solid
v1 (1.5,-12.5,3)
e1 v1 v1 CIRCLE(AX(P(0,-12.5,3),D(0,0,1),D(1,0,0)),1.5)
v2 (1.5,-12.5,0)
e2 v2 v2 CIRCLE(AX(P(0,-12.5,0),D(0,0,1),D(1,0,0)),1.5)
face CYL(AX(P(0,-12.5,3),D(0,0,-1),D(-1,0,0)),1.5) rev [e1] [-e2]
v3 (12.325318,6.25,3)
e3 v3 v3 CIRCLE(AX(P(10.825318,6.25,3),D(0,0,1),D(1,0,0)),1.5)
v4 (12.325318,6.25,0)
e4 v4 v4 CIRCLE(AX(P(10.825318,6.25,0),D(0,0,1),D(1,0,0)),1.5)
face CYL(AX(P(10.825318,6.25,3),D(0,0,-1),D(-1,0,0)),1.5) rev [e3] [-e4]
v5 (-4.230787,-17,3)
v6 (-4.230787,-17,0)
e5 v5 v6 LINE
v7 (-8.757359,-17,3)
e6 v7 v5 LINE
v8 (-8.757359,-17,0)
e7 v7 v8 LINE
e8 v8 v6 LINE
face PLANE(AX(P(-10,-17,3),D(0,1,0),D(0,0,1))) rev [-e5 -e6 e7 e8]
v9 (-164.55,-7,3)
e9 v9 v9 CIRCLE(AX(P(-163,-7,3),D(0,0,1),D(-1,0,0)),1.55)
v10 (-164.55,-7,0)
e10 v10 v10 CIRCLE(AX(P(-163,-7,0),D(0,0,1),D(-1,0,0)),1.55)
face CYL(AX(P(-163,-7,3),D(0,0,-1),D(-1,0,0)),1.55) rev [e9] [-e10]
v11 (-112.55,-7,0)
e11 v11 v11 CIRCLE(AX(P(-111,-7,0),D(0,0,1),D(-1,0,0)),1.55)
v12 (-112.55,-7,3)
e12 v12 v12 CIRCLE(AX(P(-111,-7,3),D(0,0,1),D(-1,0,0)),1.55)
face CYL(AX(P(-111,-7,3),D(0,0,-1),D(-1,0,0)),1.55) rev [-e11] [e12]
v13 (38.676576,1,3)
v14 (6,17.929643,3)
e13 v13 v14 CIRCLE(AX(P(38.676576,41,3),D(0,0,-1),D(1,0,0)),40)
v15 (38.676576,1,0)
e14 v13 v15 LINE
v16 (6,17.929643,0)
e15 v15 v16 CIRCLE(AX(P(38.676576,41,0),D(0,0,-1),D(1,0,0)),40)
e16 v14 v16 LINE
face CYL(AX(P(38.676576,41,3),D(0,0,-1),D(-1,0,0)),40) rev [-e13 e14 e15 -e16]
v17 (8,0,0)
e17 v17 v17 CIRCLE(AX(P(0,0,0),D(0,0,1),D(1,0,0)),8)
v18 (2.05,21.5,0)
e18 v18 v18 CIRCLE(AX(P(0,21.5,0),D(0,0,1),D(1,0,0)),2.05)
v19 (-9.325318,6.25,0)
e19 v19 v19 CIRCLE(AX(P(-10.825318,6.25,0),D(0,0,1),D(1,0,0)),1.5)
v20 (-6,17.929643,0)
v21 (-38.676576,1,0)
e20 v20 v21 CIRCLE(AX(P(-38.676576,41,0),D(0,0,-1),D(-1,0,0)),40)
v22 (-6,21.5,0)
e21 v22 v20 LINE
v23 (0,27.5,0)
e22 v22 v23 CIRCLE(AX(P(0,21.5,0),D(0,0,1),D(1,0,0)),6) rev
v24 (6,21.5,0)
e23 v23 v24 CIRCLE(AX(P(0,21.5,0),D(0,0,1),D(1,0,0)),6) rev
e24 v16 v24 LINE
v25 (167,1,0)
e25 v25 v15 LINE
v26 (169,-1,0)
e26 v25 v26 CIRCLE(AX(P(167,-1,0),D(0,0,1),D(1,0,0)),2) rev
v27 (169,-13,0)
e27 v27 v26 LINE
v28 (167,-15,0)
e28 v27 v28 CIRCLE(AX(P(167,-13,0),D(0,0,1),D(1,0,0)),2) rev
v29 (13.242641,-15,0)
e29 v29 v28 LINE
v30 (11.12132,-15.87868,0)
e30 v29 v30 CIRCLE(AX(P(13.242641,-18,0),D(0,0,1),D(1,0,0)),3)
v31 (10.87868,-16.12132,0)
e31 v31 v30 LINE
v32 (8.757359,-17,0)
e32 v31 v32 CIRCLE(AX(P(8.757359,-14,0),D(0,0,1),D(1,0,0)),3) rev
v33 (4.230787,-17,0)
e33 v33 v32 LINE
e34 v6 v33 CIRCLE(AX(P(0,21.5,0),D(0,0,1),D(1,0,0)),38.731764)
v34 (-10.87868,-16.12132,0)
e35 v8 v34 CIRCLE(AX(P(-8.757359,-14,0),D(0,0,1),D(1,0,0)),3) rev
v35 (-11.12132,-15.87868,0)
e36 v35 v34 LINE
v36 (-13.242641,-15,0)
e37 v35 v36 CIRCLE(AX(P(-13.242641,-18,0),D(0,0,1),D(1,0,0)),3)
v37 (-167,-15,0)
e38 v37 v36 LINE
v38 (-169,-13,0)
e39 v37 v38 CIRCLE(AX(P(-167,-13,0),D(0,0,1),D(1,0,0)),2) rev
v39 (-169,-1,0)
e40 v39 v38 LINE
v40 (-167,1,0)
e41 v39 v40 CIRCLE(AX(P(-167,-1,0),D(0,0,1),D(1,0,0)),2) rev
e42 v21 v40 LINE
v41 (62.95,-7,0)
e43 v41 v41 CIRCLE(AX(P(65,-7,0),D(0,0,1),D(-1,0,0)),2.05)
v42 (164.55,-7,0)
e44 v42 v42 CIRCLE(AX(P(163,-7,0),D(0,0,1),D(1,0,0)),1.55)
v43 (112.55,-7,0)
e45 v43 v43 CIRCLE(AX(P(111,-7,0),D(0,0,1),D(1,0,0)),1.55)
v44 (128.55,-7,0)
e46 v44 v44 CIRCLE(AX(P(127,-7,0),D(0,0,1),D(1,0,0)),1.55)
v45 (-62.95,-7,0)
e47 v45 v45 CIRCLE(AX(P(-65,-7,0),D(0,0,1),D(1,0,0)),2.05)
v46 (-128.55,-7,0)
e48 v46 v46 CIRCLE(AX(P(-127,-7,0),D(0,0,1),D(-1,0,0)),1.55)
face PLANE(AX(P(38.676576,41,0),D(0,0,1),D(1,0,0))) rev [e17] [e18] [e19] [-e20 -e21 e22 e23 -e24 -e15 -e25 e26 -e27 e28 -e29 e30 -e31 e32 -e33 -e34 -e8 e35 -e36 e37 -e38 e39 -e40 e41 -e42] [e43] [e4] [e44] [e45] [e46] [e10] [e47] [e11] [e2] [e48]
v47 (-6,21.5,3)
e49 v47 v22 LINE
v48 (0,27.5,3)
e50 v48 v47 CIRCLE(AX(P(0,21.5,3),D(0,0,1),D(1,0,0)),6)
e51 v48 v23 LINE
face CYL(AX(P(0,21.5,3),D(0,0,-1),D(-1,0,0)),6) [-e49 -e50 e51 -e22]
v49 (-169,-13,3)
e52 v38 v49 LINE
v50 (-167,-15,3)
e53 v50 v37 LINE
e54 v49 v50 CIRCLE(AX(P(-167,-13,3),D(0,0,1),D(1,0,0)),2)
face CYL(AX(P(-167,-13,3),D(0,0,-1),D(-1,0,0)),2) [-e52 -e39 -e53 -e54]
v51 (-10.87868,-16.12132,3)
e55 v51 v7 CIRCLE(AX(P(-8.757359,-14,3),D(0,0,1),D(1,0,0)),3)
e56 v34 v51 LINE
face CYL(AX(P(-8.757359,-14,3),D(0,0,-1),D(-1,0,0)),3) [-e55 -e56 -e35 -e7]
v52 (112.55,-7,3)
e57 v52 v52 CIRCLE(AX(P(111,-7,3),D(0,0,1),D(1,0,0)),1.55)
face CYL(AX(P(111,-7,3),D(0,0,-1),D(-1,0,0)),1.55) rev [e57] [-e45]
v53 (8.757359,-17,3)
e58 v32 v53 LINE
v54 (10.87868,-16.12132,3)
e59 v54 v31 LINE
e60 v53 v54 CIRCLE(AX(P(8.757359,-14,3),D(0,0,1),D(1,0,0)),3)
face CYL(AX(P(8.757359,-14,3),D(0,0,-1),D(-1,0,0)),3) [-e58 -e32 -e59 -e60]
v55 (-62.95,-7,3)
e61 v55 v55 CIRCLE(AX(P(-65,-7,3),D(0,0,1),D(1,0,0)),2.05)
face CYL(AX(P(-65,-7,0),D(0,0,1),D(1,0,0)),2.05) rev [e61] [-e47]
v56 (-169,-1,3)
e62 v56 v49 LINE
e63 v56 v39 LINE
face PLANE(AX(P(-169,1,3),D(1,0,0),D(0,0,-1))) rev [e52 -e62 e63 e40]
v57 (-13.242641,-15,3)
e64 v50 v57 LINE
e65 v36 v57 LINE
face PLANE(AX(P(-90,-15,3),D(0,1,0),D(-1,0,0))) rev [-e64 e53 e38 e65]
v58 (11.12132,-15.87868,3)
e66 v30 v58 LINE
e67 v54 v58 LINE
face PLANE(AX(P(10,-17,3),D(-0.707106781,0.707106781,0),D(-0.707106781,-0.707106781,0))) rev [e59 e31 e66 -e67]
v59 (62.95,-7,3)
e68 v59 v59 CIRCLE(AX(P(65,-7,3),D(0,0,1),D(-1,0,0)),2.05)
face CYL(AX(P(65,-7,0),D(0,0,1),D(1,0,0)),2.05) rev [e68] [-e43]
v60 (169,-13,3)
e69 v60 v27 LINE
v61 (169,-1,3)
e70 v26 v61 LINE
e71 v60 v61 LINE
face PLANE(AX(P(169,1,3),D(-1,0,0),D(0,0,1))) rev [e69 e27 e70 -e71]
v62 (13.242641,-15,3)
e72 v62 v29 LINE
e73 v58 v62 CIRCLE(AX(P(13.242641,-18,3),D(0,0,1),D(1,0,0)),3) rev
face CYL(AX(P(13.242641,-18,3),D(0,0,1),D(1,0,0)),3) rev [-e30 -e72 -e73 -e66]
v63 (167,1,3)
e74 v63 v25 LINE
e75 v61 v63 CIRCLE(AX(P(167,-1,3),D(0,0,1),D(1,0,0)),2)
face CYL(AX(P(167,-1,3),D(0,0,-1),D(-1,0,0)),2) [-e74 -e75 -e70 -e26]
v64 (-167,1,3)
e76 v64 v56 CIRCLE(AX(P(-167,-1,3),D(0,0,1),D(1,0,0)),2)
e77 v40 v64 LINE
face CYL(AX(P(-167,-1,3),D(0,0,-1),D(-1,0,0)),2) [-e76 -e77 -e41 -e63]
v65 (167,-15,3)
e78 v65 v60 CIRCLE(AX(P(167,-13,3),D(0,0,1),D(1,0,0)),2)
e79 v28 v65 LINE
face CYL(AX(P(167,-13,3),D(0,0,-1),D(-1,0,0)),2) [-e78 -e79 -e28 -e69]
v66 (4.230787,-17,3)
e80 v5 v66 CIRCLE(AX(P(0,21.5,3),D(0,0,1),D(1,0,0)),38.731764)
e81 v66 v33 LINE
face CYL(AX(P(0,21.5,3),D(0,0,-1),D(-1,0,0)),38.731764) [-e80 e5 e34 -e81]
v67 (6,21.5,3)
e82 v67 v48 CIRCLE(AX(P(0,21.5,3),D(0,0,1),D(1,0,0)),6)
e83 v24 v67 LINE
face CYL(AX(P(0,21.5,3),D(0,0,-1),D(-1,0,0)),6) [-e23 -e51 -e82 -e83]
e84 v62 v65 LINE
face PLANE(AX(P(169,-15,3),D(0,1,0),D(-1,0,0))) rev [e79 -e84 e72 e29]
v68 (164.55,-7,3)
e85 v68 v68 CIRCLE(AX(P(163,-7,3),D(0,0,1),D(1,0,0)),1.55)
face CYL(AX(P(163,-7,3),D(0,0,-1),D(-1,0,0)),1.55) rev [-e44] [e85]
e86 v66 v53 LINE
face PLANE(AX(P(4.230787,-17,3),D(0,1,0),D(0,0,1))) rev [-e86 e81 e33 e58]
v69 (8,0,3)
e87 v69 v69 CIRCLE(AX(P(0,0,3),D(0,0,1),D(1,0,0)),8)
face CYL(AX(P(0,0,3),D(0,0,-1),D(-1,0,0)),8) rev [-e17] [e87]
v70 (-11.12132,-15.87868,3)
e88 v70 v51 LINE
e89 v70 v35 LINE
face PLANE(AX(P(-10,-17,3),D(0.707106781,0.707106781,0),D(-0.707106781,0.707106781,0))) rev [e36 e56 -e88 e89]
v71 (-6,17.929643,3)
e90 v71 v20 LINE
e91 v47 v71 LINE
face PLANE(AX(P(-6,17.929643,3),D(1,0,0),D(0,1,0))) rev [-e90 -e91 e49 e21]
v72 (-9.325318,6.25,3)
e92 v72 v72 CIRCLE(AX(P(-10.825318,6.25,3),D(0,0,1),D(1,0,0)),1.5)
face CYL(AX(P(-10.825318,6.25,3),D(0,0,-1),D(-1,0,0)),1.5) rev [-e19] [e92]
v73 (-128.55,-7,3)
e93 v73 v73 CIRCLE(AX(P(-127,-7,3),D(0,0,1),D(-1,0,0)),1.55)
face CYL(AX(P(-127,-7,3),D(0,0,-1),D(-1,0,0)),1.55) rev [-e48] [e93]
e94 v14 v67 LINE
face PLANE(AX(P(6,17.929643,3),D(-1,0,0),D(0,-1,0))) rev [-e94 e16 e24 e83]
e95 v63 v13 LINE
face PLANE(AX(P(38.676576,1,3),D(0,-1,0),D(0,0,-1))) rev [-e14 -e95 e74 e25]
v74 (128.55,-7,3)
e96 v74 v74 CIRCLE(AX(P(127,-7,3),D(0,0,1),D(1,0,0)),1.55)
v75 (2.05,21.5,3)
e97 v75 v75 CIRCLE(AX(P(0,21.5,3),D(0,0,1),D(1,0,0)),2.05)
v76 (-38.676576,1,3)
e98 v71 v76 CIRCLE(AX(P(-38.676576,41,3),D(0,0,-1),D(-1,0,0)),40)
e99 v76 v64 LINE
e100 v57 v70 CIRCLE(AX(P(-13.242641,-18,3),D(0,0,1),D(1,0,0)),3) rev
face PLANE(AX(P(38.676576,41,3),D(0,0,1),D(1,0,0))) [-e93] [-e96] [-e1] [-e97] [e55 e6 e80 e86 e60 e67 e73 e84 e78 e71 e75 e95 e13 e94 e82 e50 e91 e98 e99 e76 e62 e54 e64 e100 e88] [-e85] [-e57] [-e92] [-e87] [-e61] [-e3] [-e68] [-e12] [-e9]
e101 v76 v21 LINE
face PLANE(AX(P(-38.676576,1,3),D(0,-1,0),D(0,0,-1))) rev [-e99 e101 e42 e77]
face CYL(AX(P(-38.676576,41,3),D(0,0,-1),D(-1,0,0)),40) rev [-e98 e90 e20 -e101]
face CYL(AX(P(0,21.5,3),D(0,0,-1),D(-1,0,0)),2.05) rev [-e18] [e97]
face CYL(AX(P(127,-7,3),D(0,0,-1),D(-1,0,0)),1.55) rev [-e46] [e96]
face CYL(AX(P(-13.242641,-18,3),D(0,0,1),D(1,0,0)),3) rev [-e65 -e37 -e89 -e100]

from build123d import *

# Parameters (mm, degrees)
SKETCH_8_R          = 8
SKETCH_8_R_2        = 1.5
SKETCH_8_R_3        = 1.55
SKETCH_8_R_4        = 2.05
EXTRUDE_2522_DEPTH  = 3
FILLET_27_R         = 6
FILLET_30_R         = 3
FILLET_31_R         = 2
SKETCH_9_R          = 2.05
CUT_EXTRUDE_1_DEPTH = 172.249087589


with BuildPart() as part:
    # Эскиз8 → Extrude 2522 (new body)
    with BuildSketch(Plane.XY):
        with BuildLine():
            Line((38.676576093, 1), (169, 1))
            Line((169, 1), (169, -15))
            Line((169, -15), (90, -15))
            Line((90, -15), (12, -15))
            Line((12, -15), (10, -17))
            Line((10, -17), (4.230786919, -17))
            ThreePointArc((4.230786919, -17), (0, -17.231764199), (-4.230786919, -17))
            Line((-4.230786919, -17), (-10, -17))
            Line((-10, -17), (-12, -15))
            Line((-12, -15), (-90, -15))
            Line((-90, -15), (-169, -15))
            Line((-169, -15), (-169, 1))
            Line((-169, 1), (-38.676576093, 1))
            ThreePointArc((-38.676576093, 1), (-20.275683212, 5.483705976), (-6, 17.929642941))
            Line((-6, 17.929642941), (-6, 27.5))
            Line((-6, 27.5), (6, 27.5))
            Line((6, 27.5), (6, 17.929642941))
            ThreePointArc((6, 17.929642941), (20.275683212, 5.483705976), (38.676576093, 1))
        make_face()
        Circle(SKETCH_8_R, mode=Mode.SUBTRACT)
        with Locations((0, -12.5)):
            Circle(SKETCH_8_R_2, mode=Mode.SUBTRACT)
        with Locations((163, -7)):
            Circle(SKETCH_8_R_3, mode=Mode.SUBTRACT)
        with Locations((111, -7)):
            Circle(SKETCH_8_R_3, mode=Mode.SUBTRACT)
        with Locations((0, 21.5)):
            Circle(SKETCH_8_R_4, mode=Mode.SUBTRACT)
        with Locations((127, -7)):
            Circle(SKETCH_8_R_3, mode=Mode.SUBTRACT)
        with Locations((-10.825317547, 6.25)):
            Circle(SKETCH_8_R_2, mode=Mode.SUBTRACT)
        with Locations((10.825317547, 6.25)):
            Circle(SKETCH_8_R_2, mode=Mode.SUBTRACT)
        with Locations(Location((-127, -7, 0), (0, 0, 180))):
            Circle(SKETCH_8_R_3, mode=Mode.SUBTRACT)
        with Locations(Location((-111, -7, 0), (0, 0, 180))):
            Circle(SKETCH_8_R_3, mode=Mode.SUBTRACT)
        with Locations(Location((-163, -7, 0), (0, 0, 180))):
            Circle(SKETCH_8_R_3, mode=Mode.SUBTRACT)
    extrude(amount=EXTRUDE_2522_DEPTH)

    # Скругление27
    fillet_27_edges = [part.edges().sort_by_distance(p)[0] for p in [
        (-6, 27.5, 1.5),
        (6, 27.5, 1.5),
    ]]
    fillet(fillet_27_edges, radius=FILLET_27_R - 0.0001)  # a hair under: the kernel refuses the full size

    # Скругление30
    fillet_30_edges = [part.edges().sort_by_distance(p)[0] for p in [
        (12, -15, 1.5),
        (10, -17, 1.5),
        (-10, -17, 1.5),
        (-12, -15, 1.5),
    ]]
    fillet(fillet_30_edges, radius=FILLET_30_R)

    # Скругление31
    fillet_31_edges = [part.edges().sort_by_distance(p)[0] for p in [
        (169, 1, 1.5),
        (169, -15, 1.5),
        (-169, -15, 1.5),
        (-169, 1, 1.5),
    ]]
    fillet(fillet_31_edges, radius=FILLET_31_R)

    # Эскиз9 → Вырез-Вытянуть1 (cut, through all)
    with BuildSketch(Plane.XY.offset(3)):
        with Locations((-65, -7)):
            Circle(SKETCH_9_R)
        with Locations(Location((65, -7, 0), (0, 0, 180))):
            Circle(SKETCH_9_R)
    extrude(amount=-CUT_EXTRUDE_1_DEPTH, mode=Mode.SUBTRACT)


solid = part.part
